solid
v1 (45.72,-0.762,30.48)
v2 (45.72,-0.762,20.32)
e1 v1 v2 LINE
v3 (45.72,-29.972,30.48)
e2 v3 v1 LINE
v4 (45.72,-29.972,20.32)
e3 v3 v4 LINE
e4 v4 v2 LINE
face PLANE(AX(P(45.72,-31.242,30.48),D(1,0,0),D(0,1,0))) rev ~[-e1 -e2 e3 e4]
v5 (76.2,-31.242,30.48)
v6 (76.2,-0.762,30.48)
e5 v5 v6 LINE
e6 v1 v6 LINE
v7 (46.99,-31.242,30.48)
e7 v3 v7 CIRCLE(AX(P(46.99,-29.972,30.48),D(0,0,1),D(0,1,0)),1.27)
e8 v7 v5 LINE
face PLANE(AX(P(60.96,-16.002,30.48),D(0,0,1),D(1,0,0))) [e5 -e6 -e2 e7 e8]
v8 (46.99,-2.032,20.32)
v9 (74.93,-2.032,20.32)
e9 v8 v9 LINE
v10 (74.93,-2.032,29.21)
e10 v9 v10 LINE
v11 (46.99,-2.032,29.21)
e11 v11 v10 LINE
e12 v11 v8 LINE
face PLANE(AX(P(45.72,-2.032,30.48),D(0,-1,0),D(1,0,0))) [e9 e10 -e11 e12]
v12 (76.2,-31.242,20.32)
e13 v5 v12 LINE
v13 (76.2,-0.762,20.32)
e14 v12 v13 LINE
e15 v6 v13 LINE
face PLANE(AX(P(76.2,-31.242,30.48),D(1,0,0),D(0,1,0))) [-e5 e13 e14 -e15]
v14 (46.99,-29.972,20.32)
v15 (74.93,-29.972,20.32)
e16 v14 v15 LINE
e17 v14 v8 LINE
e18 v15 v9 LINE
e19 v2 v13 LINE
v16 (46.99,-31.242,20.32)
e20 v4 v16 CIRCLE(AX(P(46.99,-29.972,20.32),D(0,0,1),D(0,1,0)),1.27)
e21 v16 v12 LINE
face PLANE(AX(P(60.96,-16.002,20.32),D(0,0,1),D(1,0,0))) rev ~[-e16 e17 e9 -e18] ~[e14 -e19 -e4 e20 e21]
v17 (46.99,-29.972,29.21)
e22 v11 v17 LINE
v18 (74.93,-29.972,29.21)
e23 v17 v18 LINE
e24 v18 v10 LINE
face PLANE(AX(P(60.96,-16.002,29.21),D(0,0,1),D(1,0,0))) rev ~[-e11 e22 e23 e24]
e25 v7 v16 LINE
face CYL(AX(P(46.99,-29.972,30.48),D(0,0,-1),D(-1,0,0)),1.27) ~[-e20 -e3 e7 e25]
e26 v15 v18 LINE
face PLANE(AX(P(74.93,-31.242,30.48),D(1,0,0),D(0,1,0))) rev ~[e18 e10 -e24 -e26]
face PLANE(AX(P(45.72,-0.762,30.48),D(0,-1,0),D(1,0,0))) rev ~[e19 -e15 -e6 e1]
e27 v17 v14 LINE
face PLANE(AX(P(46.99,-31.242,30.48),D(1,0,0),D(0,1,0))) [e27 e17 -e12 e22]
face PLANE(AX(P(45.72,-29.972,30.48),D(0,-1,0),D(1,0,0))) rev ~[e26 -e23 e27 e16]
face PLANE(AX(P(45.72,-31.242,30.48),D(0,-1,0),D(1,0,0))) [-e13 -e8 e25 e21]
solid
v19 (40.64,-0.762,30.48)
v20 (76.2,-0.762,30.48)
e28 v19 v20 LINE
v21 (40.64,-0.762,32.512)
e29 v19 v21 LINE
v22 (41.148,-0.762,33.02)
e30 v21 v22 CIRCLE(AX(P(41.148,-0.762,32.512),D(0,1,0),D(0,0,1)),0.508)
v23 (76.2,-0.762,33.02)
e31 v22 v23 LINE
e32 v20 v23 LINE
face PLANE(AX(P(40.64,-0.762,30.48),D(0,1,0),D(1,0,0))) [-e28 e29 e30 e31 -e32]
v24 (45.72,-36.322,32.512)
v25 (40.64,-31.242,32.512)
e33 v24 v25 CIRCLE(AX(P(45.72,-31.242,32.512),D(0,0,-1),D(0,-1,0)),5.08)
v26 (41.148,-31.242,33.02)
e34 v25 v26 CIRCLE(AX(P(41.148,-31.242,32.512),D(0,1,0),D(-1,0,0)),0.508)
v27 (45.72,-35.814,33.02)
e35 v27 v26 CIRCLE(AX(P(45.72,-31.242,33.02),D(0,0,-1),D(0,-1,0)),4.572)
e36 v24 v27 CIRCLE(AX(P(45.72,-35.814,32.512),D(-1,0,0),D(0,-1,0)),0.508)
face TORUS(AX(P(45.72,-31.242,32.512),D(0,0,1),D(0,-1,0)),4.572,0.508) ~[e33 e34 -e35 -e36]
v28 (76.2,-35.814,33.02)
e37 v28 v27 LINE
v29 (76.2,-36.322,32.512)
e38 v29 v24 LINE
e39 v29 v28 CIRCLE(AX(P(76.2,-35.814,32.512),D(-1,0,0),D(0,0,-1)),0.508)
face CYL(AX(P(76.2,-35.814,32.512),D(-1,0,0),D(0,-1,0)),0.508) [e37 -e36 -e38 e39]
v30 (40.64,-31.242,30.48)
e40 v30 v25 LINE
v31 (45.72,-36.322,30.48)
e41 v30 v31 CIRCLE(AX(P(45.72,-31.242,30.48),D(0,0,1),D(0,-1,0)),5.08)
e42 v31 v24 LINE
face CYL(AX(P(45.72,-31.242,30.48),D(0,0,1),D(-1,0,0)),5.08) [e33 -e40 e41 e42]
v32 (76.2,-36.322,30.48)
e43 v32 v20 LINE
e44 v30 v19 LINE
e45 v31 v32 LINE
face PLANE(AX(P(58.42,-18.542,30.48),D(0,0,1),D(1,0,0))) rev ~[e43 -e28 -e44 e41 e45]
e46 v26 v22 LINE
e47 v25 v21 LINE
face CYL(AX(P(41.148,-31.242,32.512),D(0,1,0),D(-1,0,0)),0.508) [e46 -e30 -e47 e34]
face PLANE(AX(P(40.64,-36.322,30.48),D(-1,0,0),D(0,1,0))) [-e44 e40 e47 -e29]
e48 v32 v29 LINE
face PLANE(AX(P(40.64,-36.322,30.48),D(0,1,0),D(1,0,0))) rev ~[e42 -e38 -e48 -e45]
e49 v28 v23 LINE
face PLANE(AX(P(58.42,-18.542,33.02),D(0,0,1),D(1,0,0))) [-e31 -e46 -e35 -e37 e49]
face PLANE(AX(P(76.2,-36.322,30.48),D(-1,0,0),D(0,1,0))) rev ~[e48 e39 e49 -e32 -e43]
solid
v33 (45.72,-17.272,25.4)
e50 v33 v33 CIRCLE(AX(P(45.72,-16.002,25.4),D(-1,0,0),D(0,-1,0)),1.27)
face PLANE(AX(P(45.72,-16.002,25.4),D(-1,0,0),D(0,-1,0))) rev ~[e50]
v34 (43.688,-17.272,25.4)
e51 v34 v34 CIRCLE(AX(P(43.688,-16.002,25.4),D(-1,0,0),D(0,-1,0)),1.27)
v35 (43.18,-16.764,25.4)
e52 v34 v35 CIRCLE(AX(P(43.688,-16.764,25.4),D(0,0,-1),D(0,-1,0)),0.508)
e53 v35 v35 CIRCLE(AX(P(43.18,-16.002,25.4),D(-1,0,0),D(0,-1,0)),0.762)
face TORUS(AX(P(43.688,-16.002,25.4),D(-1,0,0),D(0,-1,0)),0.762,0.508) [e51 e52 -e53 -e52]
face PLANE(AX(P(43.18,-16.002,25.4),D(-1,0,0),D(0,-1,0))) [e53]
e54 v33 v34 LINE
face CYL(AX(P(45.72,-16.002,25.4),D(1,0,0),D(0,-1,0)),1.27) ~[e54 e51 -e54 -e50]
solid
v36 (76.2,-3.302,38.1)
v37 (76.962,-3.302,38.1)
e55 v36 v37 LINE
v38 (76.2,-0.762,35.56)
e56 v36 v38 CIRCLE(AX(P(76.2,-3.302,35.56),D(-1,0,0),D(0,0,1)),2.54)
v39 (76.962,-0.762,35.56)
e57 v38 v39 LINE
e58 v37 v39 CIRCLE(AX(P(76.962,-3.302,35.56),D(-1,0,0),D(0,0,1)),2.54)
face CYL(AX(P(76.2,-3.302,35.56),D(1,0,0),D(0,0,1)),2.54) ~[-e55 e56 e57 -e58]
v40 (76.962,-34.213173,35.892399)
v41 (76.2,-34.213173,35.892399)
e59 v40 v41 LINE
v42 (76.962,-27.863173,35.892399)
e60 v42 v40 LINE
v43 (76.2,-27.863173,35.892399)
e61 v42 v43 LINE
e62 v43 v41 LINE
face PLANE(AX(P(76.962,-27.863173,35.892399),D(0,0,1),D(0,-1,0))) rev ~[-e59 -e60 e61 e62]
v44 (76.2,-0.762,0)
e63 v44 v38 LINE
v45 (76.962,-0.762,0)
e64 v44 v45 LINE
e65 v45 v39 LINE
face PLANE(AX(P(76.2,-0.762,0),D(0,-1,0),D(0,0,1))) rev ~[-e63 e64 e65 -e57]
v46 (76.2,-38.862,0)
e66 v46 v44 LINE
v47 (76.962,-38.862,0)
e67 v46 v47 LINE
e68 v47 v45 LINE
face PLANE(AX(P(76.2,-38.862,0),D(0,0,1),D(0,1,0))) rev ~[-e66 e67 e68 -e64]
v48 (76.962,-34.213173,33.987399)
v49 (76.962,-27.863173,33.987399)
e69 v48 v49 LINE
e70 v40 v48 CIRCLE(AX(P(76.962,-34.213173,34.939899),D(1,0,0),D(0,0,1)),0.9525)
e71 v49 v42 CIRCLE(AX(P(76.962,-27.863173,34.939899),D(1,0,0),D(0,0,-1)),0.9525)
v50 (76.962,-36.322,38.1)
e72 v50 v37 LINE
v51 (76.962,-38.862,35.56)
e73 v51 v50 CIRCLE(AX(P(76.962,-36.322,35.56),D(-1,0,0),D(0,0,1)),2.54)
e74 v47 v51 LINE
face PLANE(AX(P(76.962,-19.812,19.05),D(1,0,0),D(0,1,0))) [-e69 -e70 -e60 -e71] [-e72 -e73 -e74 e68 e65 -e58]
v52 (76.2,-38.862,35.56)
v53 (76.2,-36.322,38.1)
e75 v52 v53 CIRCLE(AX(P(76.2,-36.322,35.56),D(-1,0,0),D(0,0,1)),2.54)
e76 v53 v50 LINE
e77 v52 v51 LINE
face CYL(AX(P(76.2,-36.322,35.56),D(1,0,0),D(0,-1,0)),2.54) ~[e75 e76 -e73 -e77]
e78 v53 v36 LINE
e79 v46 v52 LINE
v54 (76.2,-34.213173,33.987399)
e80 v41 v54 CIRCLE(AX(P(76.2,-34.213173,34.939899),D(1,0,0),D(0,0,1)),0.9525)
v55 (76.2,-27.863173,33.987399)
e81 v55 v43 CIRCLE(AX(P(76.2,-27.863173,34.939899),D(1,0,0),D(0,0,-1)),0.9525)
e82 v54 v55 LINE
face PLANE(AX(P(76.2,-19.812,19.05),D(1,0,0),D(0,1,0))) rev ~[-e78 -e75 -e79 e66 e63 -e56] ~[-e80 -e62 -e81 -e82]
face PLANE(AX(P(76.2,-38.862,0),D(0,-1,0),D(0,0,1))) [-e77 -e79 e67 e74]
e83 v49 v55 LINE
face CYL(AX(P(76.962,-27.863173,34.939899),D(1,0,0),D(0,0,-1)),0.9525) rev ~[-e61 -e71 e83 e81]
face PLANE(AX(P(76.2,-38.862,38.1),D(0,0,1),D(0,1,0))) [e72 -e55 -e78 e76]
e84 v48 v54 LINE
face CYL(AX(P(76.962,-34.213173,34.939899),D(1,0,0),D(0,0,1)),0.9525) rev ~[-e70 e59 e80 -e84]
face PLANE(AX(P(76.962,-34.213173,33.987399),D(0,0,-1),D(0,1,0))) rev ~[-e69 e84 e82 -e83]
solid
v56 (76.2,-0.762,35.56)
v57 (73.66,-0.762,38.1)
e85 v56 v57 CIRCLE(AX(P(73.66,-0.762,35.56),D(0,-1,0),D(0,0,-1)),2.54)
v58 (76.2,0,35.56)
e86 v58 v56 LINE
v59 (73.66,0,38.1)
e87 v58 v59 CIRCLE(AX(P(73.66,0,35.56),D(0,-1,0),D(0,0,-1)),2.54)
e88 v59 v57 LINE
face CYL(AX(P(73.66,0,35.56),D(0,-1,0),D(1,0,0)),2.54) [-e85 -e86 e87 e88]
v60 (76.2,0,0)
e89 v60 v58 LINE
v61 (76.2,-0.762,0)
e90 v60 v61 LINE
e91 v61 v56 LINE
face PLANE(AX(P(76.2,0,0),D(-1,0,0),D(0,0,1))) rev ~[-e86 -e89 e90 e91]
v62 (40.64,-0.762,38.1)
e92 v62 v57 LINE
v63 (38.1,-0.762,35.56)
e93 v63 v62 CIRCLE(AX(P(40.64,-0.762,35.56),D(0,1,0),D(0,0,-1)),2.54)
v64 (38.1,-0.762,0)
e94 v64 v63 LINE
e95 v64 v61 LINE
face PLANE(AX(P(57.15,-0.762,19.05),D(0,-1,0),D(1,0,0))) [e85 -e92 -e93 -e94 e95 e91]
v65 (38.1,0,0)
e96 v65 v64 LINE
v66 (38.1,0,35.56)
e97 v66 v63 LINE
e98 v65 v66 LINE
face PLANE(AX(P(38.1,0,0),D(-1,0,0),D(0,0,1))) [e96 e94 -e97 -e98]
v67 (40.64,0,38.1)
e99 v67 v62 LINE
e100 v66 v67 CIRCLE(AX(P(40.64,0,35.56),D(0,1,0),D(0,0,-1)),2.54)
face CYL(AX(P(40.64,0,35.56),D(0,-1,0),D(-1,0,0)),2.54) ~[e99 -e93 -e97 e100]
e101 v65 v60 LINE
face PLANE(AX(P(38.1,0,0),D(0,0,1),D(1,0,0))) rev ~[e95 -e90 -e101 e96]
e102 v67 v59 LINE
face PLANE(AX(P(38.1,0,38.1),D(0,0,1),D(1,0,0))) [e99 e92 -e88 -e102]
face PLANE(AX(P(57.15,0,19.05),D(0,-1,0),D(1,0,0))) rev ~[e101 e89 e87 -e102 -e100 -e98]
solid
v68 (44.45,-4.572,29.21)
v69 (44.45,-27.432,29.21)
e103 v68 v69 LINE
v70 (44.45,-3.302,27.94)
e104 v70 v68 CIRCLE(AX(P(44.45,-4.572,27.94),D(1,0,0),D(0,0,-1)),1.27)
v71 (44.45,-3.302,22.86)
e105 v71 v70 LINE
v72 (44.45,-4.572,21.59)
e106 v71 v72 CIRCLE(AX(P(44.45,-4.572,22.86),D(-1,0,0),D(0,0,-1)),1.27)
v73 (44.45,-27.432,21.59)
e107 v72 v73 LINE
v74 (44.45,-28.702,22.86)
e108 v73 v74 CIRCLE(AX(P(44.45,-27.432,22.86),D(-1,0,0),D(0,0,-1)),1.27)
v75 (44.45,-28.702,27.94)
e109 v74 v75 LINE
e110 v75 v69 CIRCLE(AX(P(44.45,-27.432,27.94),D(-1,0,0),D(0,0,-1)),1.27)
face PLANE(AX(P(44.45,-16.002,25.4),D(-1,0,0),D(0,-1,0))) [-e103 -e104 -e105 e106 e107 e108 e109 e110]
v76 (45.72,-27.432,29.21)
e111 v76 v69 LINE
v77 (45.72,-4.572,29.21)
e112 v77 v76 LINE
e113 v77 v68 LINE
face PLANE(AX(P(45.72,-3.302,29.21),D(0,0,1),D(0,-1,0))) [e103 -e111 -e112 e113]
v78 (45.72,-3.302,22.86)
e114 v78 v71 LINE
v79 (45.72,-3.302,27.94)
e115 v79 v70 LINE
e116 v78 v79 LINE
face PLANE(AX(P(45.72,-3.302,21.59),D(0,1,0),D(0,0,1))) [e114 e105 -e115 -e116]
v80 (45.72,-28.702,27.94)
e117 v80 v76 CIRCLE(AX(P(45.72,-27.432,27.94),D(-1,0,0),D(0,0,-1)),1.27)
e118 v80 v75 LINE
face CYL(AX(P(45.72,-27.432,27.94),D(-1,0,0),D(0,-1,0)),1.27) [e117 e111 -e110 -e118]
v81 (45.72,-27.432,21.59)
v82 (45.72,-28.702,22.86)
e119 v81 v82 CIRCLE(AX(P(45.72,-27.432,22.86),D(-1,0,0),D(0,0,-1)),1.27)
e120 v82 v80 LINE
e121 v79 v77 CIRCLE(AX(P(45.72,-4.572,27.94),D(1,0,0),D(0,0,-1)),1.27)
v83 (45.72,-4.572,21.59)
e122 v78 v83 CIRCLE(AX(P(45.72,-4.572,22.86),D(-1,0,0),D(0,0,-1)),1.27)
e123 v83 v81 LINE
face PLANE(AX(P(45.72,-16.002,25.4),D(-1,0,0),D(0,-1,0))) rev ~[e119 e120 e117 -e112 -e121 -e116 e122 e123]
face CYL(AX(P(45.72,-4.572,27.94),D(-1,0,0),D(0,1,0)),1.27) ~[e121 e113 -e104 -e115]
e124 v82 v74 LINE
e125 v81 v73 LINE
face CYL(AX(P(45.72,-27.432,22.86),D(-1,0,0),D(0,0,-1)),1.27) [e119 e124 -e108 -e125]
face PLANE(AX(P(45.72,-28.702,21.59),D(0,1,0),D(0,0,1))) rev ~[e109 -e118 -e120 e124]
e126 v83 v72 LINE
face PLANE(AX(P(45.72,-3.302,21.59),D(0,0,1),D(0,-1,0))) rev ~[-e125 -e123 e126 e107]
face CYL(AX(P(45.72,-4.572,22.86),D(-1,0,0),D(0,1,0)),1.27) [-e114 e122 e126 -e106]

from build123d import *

# Parameters (mm, degrees)
F0_W      = 38.1
F0_H      = 38.1
F2_DEPTH  = 0.762
F1_W      = 38.1
F1_H      = 38.1
F3_DEPTH  = 0.762
F4_W      = 35.56
F4_H      = 35.56
F5_DEPTH  = 17.78
F8_W      = 30.48
F8_H      = 30.48
F9_DEPTH  = 10.16
F7_W      = 35.56
F7_H      = 35.56
F10_DEPTH = 2.54
F11_W     = 30.48
F11_H     = 12.7
F12_DEPTH = 1.27
F13_R     = 1.27
F14_DEPTH = 1.27
F16_R     = 1.27
F17_DEPTH = 2.54
F15_W     = 25.4
F15_H     = 7.62
F18_DEPTH = 1.27
F19_R     = 2.54
F19_2_R   = 2.54
F20_R     = 5.08
F21_R     = 1.27
F21_2_R   = 1.27
F23_DEPTH = 12.7
F24_DEPTH = 0.762
F26_W     = 38.1
F26_H     = 38.1
F27_DEPTH = 0.762
F29_DEPTH = 12.7
F30_R     = 2.54
F30_2_R   = 2.54
F31_T     = 1.27
F33_DEPTH = 25.4
F34_R     = 0.508
F35_R     = 0.508
F36_R     = 0.508
F37_R     = 2.54
F38_R     = 1.27


# Not quite as in the source:
# - a shell that OpenCascade refuses in one call is made with other operations: the cavity is built on its own and cut out
# - a feature names something its author has since deleted; it is built from what else it names


with BuildPart() as f2:
    # F0 (on Right) → F2 (new body)
    with BuildSketch(Plane.YZ):
        with Locations((-19.05, 19.05)):
            Rectangle(F0_W, F0_H)
    extrude(amount=-F2_DEPTH)

    # F19
    f19_edges = [f2.edges().sort_by_distance(p)[0] for p in [
        (-0.381, -38.1, 38.1),
        (-0.381, 0, 38.1),
    ]]
    fillet(f19_edges, radius=F19_R)

    # F22 (on face) → F23 (cut)
    with BuildSketch(Plane.YZ):
        with BuildLine():
            ThreePointArc((35.283215344, 34.4806989491), (34.330715344, 35.4331989491), (33.378215344, 34.4806989491))
            Line((33.378215344, 34.4806989491), (33.378215344, 28.1306989491))
            ThreePointArc((33.378215344, 28.1306989491), (34.330715344, 27.1781989491), (35.283215344, 28.1306989491))
            Line((35.283215344, 28.1306989491), (35.283215344, 34.4806989491))
        make_face()
    extrude(amount=-F23_DEPTH, mode=Mode.SUBTRACT)

    # F32 (on face) → F33 (cut)
    with BuildSketch(Plane(origin=(-0.762, 0, 0), x_dir=(0, -1, 0), z_dir=(-1, 0, 0))):
        with BuildLine():
            ThreePointArc((35.2714537645, 33.5571871057), (34.3189537645, 34.5096871057), (33.3664537645, 33.5571871057))
            Line((33.3664537645, 33.5571871057), (33.3664537645, 27.2071871057))
            ThreePointArc((33.3664537645, 27.2071871057), (34.3189537645, 26.2546871057), (35.2714537645, 27.2071871057))
            Line((35.2714537645, 27.2071871057), (35.2714537645, 33.5571871057))
        make_face()
    extrude(amount=-F33_DEPTH, mode=Mode.SUBTRACT)


with BuildPart() as f3:
    # F1 (on Front) → F3 (new body)
    with BuildSketch(Plane.XZ):
        with Locations((19.05, 19.05)):
            Rectangle(F1_W, F1_H)
    extrude(amount=F3_DEPTH)

    # F19#2
    f19_2_edges = [f3.edges().sort_by_distance(p)[0] for p in [
        (0, -0.381, 38.1),
    ]]
    fillet(f19_2_edges, radius=F19_2_R)


with BuildPart() as f5:
    # F4 (on Top) → F5 (new body)
    with BuildSketch(Plane.XY):
        with Locations((17.78, -18.5785688174)):
            Rectangle(F4_W, F4_H)
    extrude(amount=F5_DEPTH)

    # F21
    f21_edges = [f5.edges().sort_by_distance(p)[0] for p in [
        (35.56, -18.578569, 17.78),
    ]]
    fillet(f21_edges, radius=F21_R)


with BuildPart() as f9:
    # F8 (on offset) → F9 (new body)
    with BuildSketch(Plane.XY.offset(30.48)):
        with Locations((60.96, -16.002)):
            Rectangle(F8_W, F8_H)
    extrude(amount=-F9_DEPTH)

    # F21#2
    f21_2_edges = [f9.edges().sort_by_distance(p)[0] for p in [
        (45.72, -31.242, 25.4),
    ]]
    fillet(f21_2_edges, radius=F21_2_R)

    # F31: shell of thickness 1.27, made by hand


with BuildPart() as f10:
    # F7 (on offset) → F10 (new body)
    with BuildSketch(Plane.XY.offset(30.48)):
        with Locations((58.42, -18.542)):
            Rectangle(F7_W, F7_H)
    extrude(amount=F10_DEPTH)

    # F20
    f20_edges = [f10.edges().sort_by_distance(p)[0] for p in [
        (40.64, -36.322, 31.75),
    ]]
    fillet(f20_edges, radius=F20_R)

    # F34
    f34_edges = [f10.edges().sort_by_distance(p)[0] for p in [
        (40.64, -16.002, 33.02),
    ]]
    fillet(f34_edges, radius=F34_R)


with BuildPart() as f12:
    # F11 (on face) → F12 (new body)
    with BuildSketch(Plane.XZ.offset(36.3585688174)):
        with Locations((18.542, 8.89)):
            Rectangle(F11_W, F11_H)
    extrude(amount=F12_DEPTH)

    # F37
    f37_edges = [f12.edges().sort_by_distance(p)[0] for p in [
        (3.302, -36.993569, 15.24),
        (3.302, -36.993569, 2.54),
        (33.782, -36.993569, 2.54),
        (33.782, -36.993569, 15.24),
    ]]
    fillet(f37_edges, radius=F37_R)


with BuildPart() as f14:
    # F13 (on face) → F14 (new body)
    with BuildSketch(Plane.XZ.offset(37.6285688174)):
        with Locations((18.542, 8.89)):
            Circle(F13_R)
    extrude(amount=F14_DEPTH)

    # F35
    f35_edges = [f14.edges().sort_by_distance(p)[0] for p in [
        (17.272, -38.898569, 8.89),
    ]]
    fillet(f35_edges, radius=F35_R)


with BuildPart() as f17:
    # F16 (on face) → F17 (new body)
    with BuildSketch(Plane(origin=(45.72, 0, 0), x_dir=(0, -1, 0), z_dir=(-1, 0, 0))):
        with Locations((16.002, 25.4)):
            Circle(F16_R)
    extrude(amount=F17_DEPTH)

    # F36
    f36_edges = [f17.edges().sort_by_distance(p)[0] for p in [
        (43.18, -14.732, 25.4),
    ]]
    fillet(f36_edges, radius=F36_R)


with BuildPart() as f18:
    # F15 (on face) → F18 (new body)
    with BuildSketch(Plane(origin=(45.72, 0, 0), x_dir=(0, -1, 0), z_dir=(-1, 0, 0))):
        with Locations((16.002, 25.4)):
            Rectangle(F15_W, F15_H)
    extrude(amount=F18_DEPTH)

    # F38
    f38_edges = [f18.edges().sort_by_distance(p)[0] for p in [
        (45.085, -28.702, 21.59),
        (45.085, -28.702, 29.21),
        (45.085, -3.302, 21.59),
        (45.085, -3.302, 29.21),
    ]]
    fillet(f38_edges, radius=F38_R)


with BuildPart() as f24:
    # F1 (on Front) → F24 (new body)
    with BuildSketch(Plane.XZ):
        with Locations((57.15, 19.05)):
            Rectangle(F1_W, F1_H)
    extrude(amount=F24_DEPTH)

    # F30
    f30_edges = [f24.edges().sort_by_distance(p)[0] for p in [
        (76.2, -0.381, 38.1),
        (38.1, -0.381, 38.1),
    ]]
    fillet(f30_edges, radius=F30_R)


with BuildPart() as f27:
    # F26 (on offset) → F27 (new body)
    with BuildSketch(Plane.YZ.offset(76.2)):
        with Locations((-19.812, 19.05)):
            Rectangle(F26_W, F26_H)
    extrude(amount=F27_DEPTH)

    # F28 (on face) → F29 (cut)
    with BuildSketch(Plane.YZ.offset(76.962)):
        with BuildLine():
            Line((-27.8631728142, 35.8923991907), (-34.2131728142, 35.8923991907))
            ThreePointArc((-34.2131728142, 35.8923991907), (-35.1656728142, 34.9398991907), (-34.2131728142, 33.9873991907))
            Line((-34.2131728142, 33.9873991907), (-27.8631728142, 33.9873991907))
            ThreePointArc((-27.8631728142, 33.9873991907), (-26.9106728142, 34.9398991907), (-27.8631728142, 35.8923991907))
        make_face()
    extrude(amount=-F29_DEPTH, mode=Mode.SUBTRACT)

    # F30#2
    f30_2_edges = [f27.edges().sort_by_distance(p)[0] for p in [
        (76.581, -0.762, 38.1),
        (76.581, -38.862, 38.1),
    ]]
    fillet(f30_2_edges, radius=F30_2_R)


with BuildPart() as f31_core1:
    # F31_t2: copy of F9
    add(f9.part)

    # the walls: a layer under each face that stays
    f31_faces = [f31_core1.faces().sort_by_distance(p)[0] for p in [
        (45.72, -15.367, 25.4),
        (60.96, -16.002, 30.48),
        (60.96, -0.762, 25.4),
        (61.595, -31.242, 25.4),
        (76.2, -16.002, 25.4),
    ]]
    thicken(f31_faces, amount=-F31_T, mode=Mode.SUBTRACT)


with BuildPart() as f9_1:
    add(f9.part)

    # what is left inside the walls is the cavity
    f31_cavity = [f31_core1.part.solids().sort_by_distance(p)[0] for p in [
        (60.96, -20.658667, 20.3327),
    ]]
    add(f31_cavity, mode=Mode.SUBTRACT)


solid = Compound([f10.part, f17.part, f18.part, f24.part, f27.part, f9_1.part])
